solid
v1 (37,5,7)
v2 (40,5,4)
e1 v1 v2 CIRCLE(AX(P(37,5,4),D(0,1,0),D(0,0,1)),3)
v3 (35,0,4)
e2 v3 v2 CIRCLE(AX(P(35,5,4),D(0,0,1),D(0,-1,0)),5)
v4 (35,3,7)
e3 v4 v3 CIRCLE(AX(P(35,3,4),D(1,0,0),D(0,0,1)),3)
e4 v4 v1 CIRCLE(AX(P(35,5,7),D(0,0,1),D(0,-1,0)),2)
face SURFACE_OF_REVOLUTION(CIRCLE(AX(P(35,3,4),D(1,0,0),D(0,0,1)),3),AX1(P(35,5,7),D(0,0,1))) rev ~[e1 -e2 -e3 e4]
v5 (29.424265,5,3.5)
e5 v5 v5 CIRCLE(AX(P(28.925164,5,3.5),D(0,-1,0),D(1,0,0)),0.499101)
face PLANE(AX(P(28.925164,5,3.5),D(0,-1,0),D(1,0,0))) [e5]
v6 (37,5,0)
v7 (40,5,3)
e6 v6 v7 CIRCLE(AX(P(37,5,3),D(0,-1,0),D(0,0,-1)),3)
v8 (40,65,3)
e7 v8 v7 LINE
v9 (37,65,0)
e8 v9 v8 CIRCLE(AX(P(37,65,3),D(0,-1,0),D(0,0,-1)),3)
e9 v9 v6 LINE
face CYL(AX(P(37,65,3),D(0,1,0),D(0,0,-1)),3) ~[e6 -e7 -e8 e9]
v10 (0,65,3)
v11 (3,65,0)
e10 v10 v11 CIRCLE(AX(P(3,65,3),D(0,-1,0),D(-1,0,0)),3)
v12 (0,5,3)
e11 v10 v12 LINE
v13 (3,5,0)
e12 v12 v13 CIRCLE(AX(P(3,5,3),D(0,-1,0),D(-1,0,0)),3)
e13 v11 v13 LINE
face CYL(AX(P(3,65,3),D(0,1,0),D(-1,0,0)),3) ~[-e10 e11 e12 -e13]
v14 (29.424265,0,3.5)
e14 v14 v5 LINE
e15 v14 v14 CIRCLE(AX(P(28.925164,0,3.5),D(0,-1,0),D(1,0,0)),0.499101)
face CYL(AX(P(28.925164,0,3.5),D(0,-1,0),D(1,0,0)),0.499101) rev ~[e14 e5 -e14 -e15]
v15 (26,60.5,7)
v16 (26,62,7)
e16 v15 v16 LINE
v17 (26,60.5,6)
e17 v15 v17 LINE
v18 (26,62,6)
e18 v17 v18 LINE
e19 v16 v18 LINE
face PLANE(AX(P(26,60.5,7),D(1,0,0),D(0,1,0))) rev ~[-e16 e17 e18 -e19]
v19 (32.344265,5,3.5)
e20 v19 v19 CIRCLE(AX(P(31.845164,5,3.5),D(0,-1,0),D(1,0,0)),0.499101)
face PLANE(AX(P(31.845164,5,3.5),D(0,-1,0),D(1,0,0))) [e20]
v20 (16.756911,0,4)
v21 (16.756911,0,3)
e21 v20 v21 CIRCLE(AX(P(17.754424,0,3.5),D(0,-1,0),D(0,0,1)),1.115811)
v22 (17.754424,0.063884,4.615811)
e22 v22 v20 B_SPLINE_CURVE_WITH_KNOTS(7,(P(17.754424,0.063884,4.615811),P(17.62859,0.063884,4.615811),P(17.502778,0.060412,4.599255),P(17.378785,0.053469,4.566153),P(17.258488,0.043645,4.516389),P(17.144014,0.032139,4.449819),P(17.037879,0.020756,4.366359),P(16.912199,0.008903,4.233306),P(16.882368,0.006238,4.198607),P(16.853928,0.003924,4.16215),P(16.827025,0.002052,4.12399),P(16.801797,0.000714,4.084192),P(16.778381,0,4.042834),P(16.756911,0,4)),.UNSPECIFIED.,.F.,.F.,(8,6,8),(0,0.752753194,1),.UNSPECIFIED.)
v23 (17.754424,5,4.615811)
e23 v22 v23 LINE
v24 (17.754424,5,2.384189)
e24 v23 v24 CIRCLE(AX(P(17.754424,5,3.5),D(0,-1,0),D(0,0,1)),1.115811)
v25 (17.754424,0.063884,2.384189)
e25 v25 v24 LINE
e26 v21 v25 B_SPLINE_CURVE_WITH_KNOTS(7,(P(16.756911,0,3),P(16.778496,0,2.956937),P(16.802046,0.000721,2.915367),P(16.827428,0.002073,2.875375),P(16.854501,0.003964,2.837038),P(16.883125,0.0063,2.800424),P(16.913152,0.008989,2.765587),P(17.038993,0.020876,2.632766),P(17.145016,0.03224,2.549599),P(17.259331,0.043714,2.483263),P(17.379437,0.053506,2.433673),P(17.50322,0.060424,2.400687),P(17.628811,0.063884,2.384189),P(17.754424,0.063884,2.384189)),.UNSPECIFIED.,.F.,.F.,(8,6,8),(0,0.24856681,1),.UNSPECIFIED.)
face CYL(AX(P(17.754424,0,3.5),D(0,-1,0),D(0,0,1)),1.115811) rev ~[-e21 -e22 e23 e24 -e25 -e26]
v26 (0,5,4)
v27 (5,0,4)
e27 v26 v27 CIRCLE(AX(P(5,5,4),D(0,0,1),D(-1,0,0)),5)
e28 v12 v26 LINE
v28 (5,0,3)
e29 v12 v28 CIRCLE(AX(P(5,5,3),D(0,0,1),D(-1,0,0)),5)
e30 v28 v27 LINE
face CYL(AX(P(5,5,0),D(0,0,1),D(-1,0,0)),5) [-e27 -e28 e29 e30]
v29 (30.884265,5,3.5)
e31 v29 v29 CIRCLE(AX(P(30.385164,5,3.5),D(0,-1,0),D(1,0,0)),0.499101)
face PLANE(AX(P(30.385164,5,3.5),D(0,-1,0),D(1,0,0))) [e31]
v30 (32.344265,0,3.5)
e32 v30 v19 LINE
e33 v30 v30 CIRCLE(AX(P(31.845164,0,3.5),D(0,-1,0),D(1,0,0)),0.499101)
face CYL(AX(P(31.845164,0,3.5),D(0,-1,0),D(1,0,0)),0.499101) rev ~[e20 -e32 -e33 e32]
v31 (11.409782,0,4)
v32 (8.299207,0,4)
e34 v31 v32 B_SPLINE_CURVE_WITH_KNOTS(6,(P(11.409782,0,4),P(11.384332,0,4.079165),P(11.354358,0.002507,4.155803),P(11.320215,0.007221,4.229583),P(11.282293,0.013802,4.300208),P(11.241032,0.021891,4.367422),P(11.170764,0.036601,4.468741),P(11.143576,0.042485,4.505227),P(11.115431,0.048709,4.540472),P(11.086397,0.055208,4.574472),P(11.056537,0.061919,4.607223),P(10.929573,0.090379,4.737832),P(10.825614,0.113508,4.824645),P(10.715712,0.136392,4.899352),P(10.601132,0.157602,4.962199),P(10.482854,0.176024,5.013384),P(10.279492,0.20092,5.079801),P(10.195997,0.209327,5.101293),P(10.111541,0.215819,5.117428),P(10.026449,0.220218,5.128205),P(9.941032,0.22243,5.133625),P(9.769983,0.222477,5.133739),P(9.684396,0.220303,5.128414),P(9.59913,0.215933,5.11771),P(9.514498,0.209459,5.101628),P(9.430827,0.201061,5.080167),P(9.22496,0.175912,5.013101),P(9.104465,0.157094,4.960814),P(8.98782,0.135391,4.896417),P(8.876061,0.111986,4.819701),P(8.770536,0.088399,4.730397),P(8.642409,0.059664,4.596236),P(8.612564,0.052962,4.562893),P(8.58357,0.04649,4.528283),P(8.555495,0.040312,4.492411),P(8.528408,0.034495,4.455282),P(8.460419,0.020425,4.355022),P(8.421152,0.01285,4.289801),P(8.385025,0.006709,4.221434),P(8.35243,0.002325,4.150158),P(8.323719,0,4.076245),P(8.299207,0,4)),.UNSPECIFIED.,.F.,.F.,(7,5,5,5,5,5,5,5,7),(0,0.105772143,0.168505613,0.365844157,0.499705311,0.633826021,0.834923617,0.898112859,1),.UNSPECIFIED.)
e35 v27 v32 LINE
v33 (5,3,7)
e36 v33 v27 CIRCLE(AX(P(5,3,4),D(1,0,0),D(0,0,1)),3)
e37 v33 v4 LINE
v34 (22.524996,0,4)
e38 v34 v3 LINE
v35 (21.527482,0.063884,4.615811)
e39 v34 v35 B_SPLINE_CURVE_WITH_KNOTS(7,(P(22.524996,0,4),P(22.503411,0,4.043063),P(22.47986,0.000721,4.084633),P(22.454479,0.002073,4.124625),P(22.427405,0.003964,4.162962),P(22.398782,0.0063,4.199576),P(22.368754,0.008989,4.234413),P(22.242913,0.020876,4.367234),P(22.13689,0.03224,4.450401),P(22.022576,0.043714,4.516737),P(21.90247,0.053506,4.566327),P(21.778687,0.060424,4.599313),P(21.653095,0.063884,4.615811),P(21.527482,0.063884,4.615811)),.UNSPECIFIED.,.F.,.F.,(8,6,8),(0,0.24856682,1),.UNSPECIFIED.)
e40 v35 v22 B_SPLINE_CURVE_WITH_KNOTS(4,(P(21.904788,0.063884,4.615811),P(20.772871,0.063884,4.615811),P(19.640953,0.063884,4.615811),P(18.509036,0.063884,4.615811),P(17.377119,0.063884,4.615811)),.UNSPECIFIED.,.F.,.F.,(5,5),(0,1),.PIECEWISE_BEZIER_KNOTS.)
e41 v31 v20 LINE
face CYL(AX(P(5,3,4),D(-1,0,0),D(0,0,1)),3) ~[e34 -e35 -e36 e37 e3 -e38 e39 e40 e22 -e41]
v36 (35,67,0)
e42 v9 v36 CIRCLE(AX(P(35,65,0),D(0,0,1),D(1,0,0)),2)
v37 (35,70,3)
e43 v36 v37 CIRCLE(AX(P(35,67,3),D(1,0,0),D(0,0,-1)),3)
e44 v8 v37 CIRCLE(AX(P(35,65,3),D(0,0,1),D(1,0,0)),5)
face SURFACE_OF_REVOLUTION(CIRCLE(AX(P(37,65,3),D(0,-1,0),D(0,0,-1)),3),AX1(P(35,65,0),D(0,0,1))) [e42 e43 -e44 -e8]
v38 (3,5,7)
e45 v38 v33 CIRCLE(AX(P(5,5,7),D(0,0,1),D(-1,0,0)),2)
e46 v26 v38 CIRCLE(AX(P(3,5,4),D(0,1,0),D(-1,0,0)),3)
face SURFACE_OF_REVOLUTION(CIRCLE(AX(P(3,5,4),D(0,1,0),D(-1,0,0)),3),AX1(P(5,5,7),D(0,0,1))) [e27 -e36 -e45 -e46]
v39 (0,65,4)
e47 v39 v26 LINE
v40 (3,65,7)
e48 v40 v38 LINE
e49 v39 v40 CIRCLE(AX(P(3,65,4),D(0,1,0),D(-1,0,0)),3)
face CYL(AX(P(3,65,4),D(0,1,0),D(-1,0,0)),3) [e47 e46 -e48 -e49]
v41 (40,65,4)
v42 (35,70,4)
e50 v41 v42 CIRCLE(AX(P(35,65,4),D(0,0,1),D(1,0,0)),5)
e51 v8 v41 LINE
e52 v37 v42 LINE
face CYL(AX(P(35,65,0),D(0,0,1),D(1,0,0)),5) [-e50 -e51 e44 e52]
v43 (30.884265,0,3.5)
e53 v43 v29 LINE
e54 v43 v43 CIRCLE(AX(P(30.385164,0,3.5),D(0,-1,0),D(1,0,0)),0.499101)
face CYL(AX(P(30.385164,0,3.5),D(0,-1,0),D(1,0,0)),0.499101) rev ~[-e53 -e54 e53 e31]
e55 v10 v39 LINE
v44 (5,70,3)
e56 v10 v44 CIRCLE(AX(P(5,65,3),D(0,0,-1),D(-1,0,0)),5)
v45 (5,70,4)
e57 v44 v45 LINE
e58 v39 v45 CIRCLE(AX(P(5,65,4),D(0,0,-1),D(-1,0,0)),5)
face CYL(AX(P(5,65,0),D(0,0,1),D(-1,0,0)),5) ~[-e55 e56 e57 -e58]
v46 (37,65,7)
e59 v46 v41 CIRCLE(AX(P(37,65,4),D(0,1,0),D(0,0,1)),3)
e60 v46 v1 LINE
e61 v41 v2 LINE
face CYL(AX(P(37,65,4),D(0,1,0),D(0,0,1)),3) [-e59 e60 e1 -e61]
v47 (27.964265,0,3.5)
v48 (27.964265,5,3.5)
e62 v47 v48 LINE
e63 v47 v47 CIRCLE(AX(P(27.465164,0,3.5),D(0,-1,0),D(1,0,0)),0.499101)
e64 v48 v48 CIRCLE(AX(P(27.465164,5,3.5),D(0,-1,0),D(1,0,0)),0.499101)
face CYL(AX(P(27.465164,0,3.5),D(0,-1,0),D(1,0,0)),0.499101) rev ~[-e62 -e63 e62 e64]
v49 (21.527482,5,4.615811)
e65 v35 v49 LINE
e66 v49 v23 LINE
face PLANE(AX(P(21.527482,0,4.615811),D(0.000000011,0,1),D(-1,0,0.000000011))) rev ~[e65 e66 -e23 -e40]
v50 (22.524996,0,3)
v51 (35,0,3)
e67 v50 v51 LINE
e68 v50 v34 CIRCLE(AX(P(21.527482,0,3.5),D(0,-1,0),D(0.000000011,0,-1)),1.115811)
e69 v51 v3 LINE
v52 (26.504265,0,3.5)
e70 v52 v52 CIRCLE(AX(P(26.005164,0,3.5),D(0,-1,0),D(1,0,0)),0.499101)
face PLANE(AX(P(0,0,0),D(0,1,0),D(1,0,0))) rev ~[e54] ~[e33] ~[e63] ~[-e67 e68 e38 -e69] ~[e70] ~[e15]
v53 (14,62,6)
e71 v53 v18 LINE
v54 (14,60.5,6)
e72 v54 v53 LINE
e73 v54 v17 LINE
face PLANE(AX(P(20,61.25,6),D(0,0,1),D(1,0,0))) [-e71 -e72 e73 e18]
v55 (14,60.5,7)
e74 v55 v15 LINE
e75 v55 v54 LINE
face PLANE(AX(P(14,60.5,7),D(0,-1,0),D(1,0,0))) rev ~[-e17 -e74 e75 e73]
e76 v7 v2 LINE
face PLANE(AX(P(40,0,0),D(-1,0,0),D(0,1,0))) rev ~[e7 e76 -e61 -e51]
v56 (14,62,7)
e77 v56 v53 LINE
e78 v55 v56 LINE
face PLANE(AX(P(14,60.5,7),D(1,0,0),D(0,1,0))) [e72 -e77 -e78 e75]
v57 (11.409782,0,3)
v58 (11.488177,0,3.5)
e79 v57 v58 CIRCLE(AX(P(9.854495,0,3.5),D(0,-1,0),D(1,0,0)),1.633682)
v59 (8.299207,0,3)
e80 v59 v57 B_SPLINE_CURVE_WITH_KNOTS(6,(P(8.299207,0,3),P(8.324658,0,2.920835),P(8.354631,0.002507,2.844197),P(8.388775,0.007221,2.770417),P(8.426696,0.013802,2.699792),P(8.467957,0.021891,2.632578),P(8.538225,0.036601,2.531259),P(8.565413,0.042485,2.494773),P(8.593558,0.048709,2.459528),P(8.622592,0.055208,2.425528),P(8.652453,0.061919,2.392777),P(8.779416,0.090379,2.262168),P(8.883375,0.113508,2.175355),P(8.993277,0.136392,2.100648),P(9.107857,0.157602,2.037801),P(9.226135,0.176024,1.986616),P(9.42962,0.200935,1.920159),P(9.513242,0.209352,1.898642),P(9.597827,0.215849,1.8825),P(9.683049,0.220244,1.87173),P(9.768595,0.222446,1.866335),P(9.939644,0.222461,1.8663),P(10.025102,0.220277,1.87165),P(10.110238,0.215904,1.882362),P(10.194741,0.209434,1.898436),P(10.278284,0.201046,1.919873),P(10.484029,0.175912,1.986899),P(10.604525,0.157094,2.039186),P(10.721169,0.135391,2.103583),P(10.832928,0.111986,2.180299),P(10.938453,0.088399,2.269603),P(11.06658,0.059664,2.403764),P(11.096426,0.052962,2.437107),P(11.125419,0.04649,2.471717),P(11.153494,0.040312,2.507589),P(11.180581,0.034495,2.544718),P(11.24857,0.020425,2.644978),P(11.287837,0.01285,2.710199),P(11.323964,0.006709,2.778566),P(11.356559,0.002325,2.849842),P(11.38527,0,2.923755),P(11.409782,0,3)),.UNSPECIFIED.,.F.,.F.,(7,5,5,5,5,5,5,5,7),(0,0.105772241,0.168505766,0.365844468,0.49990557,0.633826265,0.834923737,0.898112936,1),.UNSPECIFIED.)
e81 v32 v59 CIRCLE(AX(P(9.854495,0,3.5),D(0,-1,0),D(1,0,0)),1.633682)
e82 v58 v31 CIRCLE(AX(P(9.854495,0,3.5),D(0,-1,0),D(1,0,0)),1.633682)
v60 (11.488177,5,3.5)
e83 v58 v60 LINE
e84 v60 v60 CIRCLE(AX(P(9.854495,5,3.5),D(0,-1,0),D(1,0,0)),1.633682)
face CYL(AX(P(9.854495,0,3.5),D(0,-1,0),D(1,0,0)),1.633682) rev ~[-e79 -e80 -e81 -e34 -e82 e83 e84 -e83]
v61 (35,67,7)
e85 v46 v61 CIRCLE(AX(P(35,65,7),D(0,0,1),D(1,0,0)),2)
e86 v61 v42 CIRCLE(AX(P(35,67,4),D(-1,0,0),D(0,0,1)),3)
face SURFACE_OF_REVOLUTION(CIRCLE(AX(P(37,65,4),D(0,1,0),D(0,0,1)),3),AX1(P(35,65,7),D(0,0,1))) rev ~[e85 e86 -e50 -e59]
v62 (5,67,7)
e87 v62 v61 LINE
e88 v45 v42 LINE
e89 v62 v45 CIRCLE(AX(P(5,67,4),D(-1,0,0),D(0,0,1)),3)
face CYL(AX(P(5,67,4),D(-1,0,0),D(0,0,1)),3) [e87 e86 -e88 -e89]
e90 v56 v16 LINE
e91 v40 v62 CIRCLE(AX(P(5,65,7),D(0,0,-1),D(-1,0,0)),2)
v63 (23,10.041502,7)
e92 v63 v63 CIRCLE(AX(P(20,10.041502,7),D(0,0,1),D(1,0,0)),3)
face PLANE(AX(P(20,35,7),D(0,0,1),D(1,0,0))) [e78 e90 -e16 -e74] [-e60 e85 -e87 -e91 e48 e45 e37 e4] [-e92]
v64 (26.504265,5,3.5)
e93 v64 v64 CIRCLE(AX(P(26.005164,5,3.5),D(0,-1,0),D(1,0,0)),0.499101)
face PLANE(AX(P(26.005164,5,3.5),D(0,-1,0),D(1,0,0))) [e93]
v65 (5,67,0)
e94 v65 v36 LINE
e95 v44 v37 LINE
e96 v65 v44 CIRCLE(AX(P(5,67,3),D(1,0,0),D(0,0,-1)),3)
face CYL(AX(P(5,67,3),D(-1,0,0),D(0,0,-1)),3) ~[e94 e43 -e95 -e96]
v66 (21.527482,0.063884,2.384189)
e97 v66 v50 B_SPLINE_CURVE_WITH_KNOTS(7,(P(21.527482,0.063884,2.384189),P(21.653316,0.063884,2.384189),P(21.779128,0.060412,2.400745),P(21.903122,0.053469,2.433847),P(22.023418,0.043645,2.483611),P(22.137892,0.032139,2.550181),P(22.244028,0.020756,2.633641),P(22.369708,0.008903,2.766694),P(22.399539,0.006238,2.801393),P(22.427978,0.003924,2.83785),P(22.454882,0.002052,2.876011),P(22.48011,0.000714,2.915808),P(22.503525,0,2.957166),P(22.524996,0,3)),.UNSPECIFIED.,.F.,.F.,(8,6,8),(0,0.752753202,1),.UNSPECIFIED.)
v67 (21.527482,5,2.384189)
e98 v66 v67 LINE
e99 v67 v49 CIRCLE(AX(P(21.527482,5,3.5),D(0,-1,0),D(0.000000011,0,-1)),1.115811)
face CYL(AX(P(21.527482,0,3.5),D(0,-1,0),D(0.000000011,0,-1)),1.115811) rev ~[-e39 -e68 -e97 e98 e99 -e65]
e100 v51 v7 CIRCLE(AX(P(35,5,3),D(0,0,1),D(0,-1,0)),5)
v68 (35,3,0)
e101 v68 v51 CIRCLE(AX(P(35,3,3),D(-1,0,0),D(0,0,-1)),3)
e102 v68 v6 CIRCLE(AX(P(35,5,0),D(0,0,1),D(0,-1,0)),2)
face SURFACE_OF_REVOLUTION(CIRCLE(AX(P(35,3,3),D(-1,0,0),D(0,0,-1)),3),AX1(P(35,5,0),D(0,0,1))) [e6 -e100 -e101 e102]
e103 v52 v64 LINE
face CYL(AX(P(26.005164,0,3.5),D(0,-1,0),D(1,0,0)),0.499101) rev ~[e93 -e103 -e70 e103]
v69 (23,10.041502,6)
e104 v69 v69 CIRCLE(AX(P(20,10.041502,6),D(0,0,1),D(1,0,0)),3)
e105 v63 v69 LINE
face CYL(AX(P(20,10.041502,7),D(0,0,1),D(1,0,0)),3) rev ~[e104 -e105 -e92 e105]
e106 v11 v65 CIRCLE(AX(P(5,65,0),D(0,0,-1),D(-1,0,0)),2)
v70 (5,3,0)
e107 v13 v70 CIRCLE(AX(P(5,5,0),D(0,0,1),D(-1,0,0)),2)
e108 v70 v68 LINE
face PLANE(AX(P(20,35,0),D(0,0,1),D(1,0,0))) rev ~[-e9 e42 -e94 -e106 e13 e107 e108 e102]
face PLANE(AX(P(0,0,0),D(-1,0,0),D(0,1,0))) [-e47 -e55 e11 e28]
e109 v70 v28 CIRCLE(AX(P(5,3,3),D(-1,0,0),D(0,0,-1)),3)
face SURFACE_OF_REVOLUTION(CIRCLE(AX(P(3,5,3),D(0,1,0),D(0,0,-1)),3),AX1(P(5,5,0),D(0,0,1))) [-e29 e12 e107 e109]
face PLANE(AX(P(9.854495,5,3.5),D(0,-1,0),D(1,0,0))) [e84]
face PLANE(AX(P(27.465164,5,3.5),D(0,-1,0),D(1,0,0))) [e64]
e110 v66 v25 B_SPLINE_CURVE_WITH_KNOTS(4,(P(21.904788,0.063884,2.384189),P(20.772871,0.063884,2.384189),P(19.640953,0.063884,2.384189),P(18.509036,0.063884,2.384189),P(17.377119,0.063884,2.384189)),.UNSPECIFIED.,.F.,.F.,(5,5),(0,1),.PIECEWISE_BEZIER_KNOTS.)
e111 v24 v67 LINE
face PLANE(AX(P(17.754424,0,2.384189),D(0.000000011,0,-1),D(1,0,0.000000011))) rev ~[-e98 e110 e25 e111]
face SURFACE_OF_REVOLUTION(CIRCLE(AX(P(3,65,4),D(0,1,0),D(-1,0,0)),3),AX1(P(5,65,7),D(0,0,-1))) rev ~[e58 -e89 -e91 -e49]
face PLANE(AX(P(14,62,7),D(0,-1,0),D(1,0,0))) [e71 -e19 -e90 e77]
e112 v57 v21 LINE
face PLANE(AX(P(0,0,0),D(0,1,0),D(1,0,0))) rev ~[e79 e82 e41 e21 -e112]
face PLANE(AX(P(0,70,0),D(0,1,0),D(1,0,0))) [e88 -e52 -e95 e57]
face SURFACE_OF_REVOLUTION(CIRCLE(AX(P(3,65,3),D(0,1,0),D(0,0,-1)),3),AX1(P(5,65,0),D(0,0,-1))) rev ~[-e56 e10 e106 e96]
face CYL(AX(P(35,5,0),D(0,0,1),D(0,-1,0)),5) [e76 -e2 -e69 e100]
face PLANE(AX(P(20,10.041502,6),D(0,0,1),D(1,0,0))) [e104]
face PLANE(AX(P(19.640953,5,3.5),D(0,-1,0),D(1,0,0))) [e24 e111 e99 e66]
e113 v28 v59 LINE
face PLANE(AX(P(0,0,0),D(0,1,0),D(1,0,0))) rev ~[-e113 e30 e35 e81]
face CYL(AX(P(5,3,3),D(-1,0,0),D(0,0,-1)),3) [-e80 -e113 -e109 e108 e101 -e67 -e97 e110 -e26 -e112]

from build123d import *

# Parameters (mm, degrees)
F0_W         = 40
F0_H         = 70
F1_DEPTH     = 7
F2_R         = 5
F3_R         = 0.4991012629
F3_R_2       = 1.6336823689
F4_DEPTH     = 5
F5_T1_DEPTH  = 60
F5_T3_DEPTH  = 30
F5_T6_ANGLE  = 90
F5_T8_ANGLE  = 90
F5_T10_ANGLE = 90
F5_T12_ANGLE = 90
F5_T14_ANGLE = 90
F5_T16_ANGLE = 90
F5_T18_ANGLE = 90
F5_T20_ANGLE = 90
F6_R         = 3
F6_W         = 12
F6_H         = 1.5
F7_DEPTH     = 1


# Not quite as in the source:
# - a fillet or chamfer that OpenCascade refuses, or shapes differently, is made with other operations: its cross-section is extruded or revolved along the edge and cut away or added


with BuildPart() as f1:
    # F0 (on Top) → F1 (new body)
    with BuildSketch(Plane.XY):
        with Locations((20, 35)):
            Rectangle(F0_W, F0_H)
    extrude(amount=F1_DEPTH)

    # F2
    f2_edges = [f1.edges().sort_by_distance(p)[0] for p in [
        (40, 0, 3.5),
        (0, 0, 3.5),
        (40, 70, 3.5),
        (0, 70, 3.5),
    ]]
    fillet(f2_edges, radius=F2_R)

    # F3 (on face) → F4 (cut)
    with BuildSketch(Plane.XZ):
        with BuildLine():
            Line((21.5274822088, 4.6158107299), (17.7544243634, 4.6158107708))
            ThreePointArc((17.7544243634, 4.6158107708), (16.6386135926, 3.5), (17.7544243634, 2.3841892292))
            Line((17.7544243634, 2.3841892292), (21.5274822088, 2.3841892701))
            ThreePointArc((21.5274822088, 2.3841892701), (22.6432929266, 3.5), (21.5274822088, 4.6158107299))
        make_face()
        with Locations((26.0051637888, 3.5)):
            Circle(F3_R)
        with Locations((27.4651637888, 3.5)):
            Circle(F3_R)
        with Locations((28.9251637888, 3.5)):
            Circle(F3_R)
        with Locations((30.3851637888, 3.5)):
            Circle(F3_R)
        with Locations((31.8451637888, 3.5)):
            Circle(F3_R)
        with Locations((9.854494594, 3.5)):
            Circle(F3_R_2)
    extrude(amount=-F4_DEPTH, mode=Mode.SUBTRACT)

    # F5: fillet of radius 3 on 16 edges, made by hand

    # F5_s2 → F5_t1 (cut)
    with BuildSketch(Plane.XZ.offset(-65)):
        with BuildLine():
            ThreePointArc((0, 4), (0.8786796564, 6.1213203436), (3, 7))
            Line((3, 7), (0, 7))
            Line((0, 7), (0, 4))
        make_face()
        with BuildLine():
            ThreePointArc((0, 3), (0.8786796564, 0.8786796564), (3, 0))
            Line((3, 0), (0, 0))
            Line((0, 0), (0, 3))
        make_face()
        with BuildLine():
            ThreePointArc((37, 0), (39.1213203436, 0.8786796564), (40, 3))
            Line((40, 3), (40, 0))
            Line((40, 0), (37, 0))
        make_face()
        with BuildLine():
            ThreePointArc((37, 7), (39.1213203436, 6.1213203436), (40, 4))
            Line((40, 4), (40, 7))
            Line((40, 7), (37, 7))
        make_face()
    extrude(amount=F5_T1_DEPTH, mode=Mode.SUBTRACT)

    # F5_s4 → F5_t3 (cut)
    with BuildSketch(Plane.YZ.offset(5)):
        with BuildLine():
            ThreePointArc((67, 0), (69.1213203436, 0.8786796564), (70, 3))
            Line((70, 3), (70, 0))
            Line((70, 0), (67, 0))
        make_face()
        with BuildLine():
            ThreePointArc((3, 0), (0.8786796564, 0.8786796564), (0, 3))
            Line((0, 3), (0, 0))
            Line((0, 0), (3, 0))
        make_face()
        with BuildLine():
            ThreePointArc((67, 7), (69.1213203436, 6.1213203436), (70, 4))
            Line((70, 4), (70, 7))
            Line((70, 7), (67, 7))
        make_face()
        with BuildLine():
            ThreePointArc((3, 7), (0.8786796564, 6.1213203436), (0, 4))
            Line((0, 4), (0, 7))
            Line((0, 7), (3, 7))
        make_face()
    extrude(amount=F5_T3_DEPTH, mode=Mode.SUBTRACT)

    # F5_s5 → F5_t6 (revolve, cut)
    with BuildSketch(Plane.XZ.offset(-65)):
        with BuildLine():
            ThreePointArc((3, 0), (0.8786796564, 0.8786796564), (0, 3))
            Line((0, 3), (0, 0))
            Line((0, 0), (3, 0))
        make_face()
    revolve(axis=Axis((5, 65, 0), (0, 0, -1)), revolution_arc=F5_T6_ANGLE, mode=Mode.SUBTRACT)

    # F5_s7 → F5_t8 (revolve, cut)
    with BuildSketch(Plane.XZ.offset(-5)):
        with BuildLine():
            ThreePointArc((3, 0), (0.8786796564, 0.8786796564), (0, 3))
            Line((0, 3), (0, 0))
            Line((0, 0), (3, 0))
        make_face()
    revolve(axis=Axis((5, 5, 0), (0, 0, 1)), revolution_arc=F5_T8_ANGLE, mode=Mode.SUBTRACT)

    # F5_s9 → F5_t10 (revolve, cut)
    with BuildSketch(Plane.XZ.offset(-65)):
        with BuildLine():
            ThreePointArc((37, 0), (39.1213203436, 0.8786796564), (40, 3))
            Line((40, 3), (40, 0))
            Line((40, 0), (37, 0))
        make_face()
    revolve(axis=Axis((35, 65, 0), (0, 0, 1)), revolution_arc=F5_T10_ANGLE, mode=Mode.SUBTRACT)

    # F5_s11 → F5_t12 (revolve, cut)
    with BuildSketch(Plane.YZ.offset(35)):
        with BuildLine():
            ThreePointArc((3, 0), (0.8786796564, 0.8786796564), (0, 3))
            Line((0, 3), (0, 0))
            Line((0, 0), (3, 0))
        make_face()
    revolve(axis=Axis((35, 5, 0), (0, 0, 1)), revolution_arc=F5_T12_ANGLE, mode=Mode.SUBTRACT)

    # F5_s13 → F5_t14 (revolve, cut)
    with BuildSketch(Plane.XZ.offset(-65)):
        with BuildLine():
            ThreePointArc((0, 4), (0.8786796564, 6.1213203436), (3, 7))
            Line((3, 7), (0, 7))
            Line((0, 7), (0, 4))
        make_face()
    revolve(axis=Axis((5, 65, 7), (0, 0, -1)), revolution_arc=F5_T14_ANGLE, mode=Mode.SUBTRACT)

    # F5_s15 → F5_t16 (revolve, cut)
    with BuildSketch(Plane.XZ.offset(-5)):
        with BuildLine():
            ThreePointArc((0, 4), (0.8786796564, 6.1213203436), (3, 7))
            Line((3, 7), (0, 7))
            Line((0, 7), (0, 4))
        make_face()
    revolve(axis=Axis((5, 5, 7), (0, 0, 1)), revolution_arc=F5_T16_ANGLE, mode=Mode.SUBTRACT)

    # F5_s17 → F5_t18 (revolve, cut)
    with BuildSketch(Plane.XZ.offset(-65)):
        with BuildLine():
            ThreePointArc((37, 7), (39.1213203436, 6.1213203436), (40, 4))
            Line((40, 4), (40, 7))
            Line((40, 7), (37, 7))
        make_face()
    revolve(axis=Axis((35, 65, 7), (0, 0, 1)), revolution_arc=F5_T18_ANGLE, mode=Mode.SUBTRACT)

    # F5_s19 → F5_t20 (revolve, cut)
    with BuildSketch(Plane.YZ.offset(35)):
        with BuildLine():
            ThreePointArc((3, 7), (0.8786796564, 6.1213203436), (0, 4))
            Line((0, 4), (0, 7))
            Line((0, 7), (3, 7))
        make_face()
    revolve(axis=Axis((35, 5, 7), (0, 0, 1)), revolution_arc=F5_T20_ANGLE, mode=Mode.SUBTRACT)

    # F6 (on face) → F7 (cut)
    with BuildSketch(Plane.XY.offset(7)):
        with Locations((20, 10.0415023044)):
            Circle(F6_R)
        with Locations((20, 61.25)):
            Rectangle(F6_W, F6_H)
    extrude(amount=-F7_DEPTH, mode=Mode.SUBTRACT)


solid = f1.part
